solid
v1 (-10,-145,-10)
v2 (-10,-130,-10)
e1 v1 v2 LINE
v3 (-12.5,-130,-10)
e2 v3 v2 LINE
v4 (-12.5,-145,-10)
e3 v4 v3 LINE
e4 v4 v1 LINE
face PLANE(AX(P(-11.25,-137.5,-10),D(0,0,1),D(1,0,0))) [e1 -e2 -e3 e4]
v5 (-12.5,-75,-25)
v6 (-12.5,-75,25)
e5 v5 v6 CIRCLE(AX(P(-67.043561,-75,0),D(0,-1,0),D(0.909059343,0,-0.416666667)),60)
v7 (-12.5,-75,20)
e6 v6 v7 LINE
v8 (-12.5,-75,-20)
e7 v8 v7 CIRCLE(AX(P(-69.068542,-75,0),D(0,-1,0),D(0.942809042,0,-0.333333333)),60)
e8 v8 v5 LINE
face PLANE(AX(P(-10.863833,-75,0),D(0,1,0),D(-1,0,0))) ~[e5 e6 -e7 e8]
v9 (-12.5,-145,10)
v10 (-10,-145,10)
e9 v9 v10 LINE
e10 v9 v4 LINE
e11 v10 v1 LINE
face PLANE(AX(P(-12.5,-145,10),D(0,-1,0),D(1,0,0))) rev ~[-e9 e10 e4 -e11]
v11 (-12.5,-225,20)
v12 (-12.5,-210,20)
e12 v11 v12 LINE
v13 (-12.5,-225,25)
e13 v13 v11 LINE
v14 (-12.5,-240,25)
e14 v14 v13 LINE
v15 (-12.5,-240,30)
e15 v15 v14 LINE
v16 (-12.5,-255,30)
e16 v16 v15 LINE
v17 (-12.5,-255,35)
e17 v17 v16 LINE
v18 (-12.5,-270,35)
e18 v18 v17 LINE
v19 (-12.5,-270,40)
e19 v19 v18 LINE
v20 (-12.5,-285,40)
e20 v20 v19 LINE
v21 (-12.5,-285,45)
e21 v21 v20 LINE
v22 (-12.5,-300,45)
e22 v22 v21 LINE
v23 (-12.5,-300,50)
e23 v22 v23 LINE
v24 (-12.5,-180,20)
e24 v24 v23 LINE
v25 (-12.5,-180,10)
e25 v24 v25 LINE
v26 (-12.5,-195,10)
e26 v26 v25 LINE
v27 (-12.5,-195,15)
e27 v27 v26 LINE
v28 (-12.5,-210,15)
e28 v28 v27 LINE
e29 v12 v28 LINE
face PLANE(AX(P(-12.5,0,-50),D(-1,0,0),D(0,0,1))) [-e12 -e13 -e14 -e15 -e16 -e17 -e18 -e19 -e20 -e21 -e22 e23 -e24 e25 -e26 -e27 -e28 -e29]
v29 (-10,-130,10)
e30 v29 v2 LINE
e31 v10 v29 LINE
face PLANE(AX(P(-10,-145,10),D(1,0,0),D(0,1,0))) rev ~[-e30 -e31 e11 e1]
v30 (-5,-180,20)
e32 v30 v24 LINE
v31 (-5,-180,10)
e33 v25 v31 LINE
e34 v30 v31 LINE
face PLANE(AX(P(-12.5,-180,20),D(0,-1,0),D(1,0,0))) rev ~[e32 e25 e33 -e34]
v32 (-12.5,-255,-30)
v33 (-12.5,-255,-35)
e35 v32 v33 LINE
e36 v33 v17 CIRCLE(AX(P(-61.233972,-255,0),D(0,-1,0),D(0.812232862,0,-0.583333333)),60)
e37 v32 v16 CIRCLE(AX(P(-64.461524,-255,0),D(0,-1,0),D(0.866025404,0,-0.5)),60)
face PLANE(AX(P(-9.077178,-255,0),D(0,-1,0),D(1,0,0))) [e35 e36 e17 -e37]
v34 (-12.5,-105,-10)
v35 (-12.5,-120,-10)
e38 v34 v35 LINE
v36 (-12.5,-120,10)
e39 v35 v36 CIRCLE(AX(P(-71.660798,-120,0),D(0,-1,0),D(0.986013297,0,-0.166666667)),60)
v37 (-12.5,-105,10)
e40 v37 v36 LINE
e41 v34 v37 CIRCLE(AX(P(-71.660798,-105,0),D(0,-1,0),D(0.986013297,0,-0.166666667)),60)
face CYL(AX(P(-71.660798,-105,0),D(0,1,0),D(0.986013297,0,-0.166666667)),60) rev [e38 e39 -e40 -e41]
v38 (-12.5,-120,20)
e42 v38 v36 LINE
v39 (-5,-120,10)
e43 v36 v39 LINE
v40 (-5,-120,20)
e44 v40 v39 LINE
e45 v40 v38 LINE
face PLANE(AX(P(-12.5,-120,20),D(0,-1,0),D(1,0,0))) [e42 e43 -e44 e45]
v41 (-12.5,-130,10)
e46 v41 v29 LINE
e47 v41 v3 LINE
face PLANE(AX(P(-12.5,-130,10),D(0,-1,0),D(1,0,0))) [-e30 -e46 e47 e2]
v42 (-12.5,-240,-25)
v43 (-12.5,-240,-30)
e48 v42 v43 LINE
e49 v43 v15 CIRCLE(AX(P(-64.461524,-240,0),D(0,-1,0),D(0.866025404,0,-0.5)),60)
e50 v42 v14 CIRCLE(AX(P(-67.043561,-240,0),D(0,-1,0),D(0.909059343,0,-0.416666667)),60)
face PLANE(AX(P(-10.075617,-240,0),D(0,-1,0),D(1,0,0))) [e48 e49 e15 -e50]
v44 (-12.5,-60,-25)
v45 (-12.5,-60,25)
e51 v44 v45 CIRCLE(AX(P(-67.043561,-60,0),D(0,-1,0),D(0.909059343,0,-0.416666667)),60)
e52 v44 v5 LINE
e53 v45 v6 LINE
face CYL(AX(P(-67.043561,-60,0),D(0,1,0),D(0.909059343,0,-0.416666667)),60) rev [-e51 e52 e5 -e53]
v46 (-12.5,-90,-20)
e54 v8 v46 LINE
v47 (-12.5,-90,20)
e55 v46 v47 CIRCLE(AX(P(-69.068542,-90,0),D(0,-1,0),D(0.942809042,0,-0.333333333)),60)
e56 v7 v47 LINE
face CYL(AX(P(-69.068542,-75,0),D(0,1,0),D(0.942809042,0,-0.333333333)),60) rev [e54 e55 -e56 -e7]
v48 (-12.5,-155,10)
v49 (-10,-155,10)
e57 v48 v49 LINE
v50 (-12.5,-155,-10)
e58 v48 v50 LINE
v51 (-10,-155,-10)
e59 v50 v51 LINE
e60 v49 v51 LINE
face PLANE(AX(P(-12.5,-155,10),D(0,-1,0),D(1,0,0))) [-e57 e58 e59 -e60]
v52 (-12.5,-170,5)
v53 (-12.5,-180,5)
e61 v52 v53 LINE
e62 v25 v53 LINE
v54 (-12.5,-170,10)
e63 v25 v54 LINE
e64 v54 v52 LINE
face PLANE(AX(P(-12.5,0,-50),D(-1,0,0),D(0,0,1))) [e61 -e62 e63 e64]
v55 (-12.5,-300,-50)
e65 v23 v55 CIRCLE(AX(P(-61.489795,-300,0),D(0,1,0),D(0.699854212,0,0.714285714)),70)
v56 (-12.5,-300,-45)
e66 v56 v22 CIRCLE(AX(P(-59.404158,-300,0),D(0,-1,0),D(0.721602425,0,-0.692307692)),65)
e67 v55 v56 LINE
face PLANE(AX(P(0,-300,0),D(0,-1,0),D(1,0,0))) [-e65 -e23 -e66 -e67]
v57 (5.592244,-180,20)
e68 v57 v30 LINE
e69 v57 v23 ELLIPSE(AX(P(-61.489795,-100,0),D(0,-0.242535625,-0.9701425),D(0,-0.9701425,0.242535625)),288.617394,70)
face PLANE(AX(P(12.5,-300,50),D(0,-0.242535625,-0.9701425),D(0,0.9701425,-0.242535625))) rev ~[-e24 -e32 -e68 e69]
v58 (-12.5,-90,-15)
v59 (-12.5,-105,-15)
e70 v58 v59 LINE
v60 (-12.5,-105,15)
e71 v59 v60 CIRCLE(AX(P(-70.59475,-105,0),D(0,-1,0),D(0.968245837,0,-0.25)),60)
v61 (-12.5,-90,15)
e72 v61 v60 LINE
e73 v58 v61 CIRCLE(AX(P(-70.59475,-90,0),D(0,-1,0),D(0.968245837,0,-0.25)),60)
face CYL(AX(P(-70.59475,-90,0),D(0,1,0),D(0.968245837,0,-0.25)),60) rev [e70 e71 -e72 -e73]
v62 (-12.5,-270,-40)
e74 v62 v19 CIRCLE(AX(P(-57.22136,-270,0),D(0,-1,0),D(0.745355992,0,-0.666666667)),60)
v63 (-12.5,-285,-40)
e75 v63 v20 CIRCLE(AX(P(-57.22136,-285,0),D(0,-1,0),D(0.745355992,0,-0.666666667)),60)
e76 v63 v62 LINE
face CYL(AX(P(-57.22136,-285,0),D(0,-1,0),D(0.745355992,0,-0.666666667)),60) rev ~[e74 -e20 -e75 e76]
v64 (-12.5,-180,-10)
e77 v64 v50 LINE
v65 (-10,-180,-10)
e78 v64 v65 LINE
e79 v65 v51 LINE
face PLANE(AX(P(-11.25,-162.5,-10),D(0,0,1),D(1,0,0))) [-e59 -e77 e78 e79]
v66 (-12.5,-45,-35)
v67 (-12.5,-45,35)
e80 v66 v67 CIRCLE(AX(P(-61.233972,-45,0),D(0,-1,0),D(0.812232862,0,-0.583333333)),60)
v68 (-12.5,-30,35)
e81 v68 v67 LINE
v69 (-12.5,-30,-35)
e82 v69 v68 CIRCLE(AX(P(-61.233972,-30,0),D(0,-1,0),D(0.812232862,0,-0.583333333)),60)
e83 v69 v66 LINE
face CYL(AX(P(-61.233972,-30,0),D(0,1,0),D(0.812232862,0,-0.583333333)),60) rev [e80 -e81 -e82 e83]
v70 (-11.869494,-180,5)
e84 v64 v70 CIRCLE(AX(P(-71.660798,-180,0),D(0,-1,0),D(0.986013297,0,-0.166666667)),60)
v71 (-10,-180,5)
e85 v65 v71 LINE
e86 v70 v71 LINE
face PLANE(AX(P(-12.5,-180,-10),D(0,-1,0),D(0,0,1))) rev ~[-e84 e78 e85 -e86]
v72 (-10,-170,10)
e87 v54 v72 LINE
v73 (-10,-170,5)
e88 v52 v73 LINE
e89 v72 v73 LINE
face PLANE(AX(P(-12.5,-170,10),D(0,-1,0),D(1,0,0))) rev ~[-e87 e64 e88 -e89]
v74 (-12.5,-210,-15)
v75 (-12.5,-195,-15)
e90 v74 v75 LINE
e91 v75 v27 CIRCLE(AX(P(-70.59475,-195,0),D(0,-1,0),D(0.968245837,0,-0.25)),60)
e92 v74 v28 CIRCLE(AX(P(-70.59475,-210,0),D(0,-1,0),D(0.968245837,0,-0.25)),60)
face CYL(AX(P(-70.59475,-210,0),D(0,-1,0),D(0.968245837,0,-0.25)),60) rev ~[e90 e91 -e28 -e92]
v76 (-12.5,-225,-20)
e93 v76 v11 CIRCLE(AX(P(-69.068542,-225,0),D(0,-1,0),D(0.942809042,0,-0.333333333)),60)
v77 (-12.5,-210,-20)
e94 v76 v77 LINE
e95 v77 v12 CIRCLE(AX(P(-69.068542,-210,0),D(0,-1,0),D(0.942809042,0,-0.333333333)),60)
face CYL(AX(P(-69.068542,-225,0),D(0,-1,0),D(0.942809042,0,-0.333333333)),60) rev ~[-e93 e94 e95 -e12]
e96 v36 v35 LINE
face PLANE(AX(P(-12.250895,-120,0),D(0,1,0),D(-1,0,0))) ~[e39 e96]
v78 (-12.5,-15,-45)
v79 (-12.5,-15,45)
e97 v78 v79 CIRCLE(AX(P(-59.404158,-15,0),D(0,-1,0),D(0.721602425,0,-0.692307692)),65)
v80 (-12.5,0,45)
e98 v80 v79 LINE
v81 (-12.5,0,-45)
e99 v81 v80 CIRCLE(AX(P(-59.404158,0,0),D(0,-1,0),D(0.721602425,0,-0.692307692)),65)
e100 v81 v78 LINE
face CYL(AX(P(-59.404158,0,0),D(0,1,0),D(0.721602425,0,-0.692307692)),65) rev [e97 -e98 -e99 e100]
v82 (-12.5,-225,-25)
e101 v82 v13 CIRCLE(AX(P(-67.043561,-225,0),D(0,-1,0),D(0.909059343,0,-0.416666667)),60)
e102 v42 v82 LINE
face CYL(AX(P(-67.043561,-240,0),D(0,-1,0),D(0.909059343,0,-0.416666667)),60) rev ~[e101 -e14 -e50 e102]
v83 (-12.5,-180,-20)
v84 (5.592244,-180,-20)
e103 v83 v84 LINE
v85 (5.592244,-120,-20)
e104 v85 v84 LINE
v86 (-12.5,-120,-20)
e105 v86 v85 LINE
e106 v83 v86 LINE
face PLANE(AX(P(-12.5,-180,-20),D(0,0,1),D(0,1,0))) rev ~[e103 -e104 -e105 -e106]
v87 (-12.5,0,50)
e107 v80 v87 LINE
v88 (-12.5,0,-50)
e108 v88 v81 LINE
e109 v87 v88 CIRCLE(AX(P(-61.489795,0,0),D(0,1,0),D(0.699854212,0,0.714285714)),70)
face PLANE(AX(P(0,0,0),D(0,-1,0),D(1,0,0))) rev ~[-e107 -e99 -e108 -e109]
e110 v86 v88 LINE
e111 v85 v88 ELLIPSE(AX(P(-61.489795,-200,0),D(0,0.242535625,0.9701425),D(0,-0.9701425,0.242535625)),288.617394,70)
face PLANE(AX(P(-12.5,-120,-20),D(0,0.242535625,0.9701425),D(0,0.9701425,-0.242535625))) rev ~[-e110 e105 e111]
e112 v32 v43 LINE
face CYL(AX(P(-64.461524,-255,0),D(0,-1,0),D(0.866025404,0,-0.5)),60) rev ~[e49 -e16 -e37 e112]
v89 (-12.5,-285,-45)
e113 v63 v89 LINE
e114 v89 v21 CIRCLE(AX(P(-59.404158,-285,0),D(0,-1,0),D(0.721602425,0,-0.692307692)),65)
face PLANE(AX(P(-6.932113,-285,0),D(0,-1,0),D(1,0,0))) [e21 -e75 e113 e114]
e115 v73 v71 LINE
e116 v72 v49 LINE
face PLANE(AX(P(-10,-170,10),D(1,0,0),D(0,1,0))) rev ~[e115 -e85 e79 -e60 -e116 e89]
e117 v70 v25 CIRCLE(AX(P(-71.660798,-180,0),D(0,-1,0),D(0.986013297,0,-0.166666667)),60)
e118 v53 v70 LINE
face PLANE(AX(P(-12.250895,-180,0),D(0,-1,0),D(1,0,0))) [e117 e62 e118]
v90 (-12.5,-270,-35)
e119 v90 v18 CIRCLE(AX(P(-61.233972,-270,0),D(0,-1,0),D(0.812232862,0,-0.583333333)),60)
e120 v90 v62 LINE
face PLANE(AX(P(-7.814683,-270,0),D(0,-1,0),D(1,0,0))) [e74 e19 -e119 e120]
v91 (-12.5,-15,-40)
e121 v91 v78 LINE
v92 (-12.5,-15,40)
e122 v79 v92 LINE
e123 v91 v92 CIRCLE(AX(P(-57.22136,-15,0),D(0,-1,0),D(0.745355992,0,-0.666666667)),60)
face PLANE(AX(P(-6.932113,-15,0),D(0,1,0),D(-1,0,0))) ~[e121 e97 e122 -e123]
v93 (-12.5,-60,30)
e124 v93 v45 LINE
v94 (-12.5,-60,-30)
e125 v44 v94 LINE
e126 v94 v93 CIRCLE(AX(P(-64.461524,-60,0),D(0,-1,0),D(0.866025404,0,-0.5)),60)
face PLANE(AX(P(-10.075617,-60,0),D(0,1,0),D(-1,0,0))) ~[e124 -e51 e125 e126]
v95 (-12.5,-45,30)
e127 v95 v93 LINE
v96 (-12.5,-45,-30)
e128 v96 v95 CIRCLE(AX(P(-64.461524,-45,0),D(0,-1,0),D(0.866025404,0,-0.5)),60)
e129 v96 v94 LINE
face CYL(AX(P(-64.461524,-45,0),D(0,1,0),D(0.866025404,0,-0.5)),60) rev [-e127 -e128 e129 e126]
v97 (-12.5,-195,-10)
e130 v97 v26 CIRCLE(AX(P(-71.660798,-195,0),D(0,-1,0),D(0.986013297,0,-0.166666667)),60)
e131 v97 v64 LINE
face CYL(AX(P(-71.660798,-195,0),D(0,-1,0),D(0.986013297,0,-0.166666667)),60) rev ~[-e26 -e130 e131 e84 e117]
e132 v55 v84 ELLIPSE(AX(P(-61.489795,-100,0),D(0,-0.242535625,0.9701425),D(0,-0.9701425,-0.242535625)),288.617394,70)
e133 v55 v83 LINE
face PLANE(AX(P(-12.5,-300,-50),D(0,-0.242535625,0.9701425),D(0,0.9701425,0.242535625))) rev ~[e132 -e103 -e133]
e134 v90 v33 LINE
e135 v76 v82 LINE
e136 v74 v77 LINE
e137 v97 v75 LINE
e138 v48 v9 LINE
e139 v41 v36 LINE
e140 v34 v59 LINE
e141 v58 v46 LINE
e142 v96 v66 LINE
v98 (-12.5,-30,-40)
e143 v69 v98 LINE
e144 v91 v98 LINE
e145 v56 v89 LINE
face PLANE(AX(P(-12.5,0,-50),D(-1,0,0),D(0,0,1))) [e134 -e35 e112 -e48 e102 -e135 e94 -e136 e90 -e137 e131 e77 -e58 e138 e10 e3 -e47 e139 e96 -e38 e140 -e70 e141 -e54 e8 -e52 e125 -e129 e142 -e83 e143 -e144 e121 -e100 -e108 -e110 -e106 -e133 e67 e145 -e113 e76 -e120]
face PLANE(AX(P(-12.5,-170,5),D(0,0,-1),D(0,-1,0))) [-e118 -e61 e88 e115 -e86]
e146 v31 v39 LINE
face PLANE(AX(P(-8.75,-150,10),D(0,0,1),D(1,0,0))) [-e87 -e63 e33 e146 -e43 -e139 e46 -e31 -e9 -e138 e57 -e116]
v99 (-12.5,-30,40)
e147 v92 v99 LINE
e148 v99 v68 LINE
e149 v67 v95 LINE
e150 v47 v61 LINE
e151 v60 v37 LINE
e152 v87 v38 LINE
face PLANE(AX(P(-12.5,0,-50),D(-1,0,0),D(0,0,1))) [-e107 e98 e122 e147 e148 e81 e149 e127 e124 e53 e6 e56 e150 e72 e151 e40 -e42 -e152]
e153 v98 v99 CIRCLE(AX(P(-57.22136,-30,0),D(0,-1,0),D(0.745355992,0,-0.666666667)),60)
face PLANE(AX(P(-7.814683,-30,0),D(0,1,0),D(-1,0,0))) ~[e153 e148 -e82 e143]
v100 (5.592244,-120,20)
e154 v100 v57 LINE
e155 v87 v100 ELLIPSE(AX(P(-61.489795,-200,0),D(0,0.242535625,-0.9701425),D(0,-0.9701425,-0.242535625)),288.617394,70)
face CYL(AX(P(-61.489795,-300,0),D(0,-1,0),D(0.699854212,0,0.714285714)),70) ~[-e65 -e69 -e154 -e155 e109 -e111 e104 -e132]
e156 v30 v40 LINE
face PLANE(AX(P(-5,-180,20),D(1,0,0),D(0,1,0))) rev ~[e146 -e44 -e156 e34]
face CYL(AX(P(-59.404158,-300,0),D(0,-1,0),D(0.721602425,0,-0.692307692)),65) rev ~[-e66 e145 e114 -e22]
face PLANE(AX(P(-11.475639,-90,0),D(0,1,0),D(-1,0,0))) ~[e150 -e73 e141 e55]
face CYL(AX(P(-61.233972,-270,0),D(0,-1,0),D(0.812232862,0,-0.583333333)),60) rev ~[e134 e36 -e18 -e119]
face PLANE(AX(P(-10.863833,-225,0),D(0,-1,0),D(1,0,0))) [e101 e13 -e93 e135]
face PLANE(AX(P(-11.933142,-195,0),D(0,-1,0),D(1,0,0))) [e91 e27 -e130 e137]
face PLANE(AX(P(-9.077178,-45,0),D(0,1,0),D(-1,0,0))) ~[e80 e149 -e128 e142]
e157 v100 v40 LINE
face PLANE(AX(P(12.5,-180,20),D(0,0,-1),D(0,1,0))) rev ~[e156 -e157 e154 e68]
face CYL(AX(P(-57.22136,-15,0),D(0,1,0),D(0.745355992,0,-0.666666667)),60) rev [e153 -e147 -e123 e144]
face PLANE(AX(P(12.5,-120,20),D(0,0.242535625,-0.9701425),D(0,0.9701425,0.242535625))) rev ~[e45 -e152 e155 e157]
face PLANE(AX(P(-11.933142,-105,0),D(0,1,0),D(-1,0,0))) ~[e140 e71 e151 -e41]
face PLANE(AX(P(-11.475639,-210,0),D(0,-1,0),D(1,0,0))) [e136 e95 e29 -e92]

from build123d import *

# Parameters (mm, degrees)
F0_W      = 25
F0_H      = 100
F1_DEPTH  = 300
F3_DEPTH  = 80
F5_DEPTH  = 80
F7_DEPTH  = 15
F9_DEPTH  = 15
F11_DEPTH = 15
F13_DEPTH = 15
F15_DEPTH = 15
F17_DEPTH = 15
F19_DEPTH = 15
F21_DEPTH = 15
F23_DEPTH = 300
F24_W     = 7.5
F24_H     = 60
F25_DEPTH = 10
F26_W     = 2.5
F26_H     = 15
F27_DEPTH = 20
F28_W     = 10
F28_H     = 15
F29_DEPTH = 2.5


# Not quite as in the source:
# - a pattern or mirror of a feature is missing from the dataset's text; its kind, count and spacing are read off the source's solid


with BuildPart() as f1:
    # F0 (on Front) → F1 (new body)
    with BuildSketch(Plane.XZ):
        Rectangle(F0_W, F0_H)
    extrude(amount=F1_DEPTH)

    # F2 (on face) → F3 (cut)
    with BuildSketch(Plane.YZ.offset(12.5)):
        Polygon((-180, 20), (-120, 20), (0, 50), (-300, 50), align=None)
    extrude(amount=-F3_DEPTH, mode=Mode.SUBTRACT)

    # F4 (on face) → F5 (cut)
    with BuildSketch(Plane(origin=(-12.5, 0, 0), x_dir=(0, -1, 0), z_dir=(-1, 0, 0))):
        Polygon((180, -20), (120, -20), (0, -50), (300, -50), align=None)
    extrude(amount=-F5_DEPTH, mode=Mode.SUBTRACT)

    # F6 (on face) → F7 (cut)
    with BuildSketch(Plane.XZ.offset(300)):
        with BuildLine():
            Line((-12.5, 45), (-12.5, -45))
            ThreePointArc((-12.5, -45), (5.5958424018, 0), (-12.5, 45))
        make_face()
    f7 = extrude(amount=-F7_DEPTH, mode=Mode.SUBTRACT)

    # F7_copies: F7 across plane
    add(f7.mirror(Plane.ZX.offset(-150)), mode=Mode.SUBTRACT)

    # F8 (on face) → F9 (cut)
    with BuildSketch(Plane.XZ.offset(285)):
        with BuildLine():
            Line((-12.5, 40), (-12.5, -40))
            ThreePointArc((-12.5, -40), (2.77864045, 0), (-12.5, 40))
        make_face()
    f9 = extrude(amount=-F9_DEPTH, mode=Mode.SUBTRACT)

    # F9_copies: F9 across plane
    add(f9.mirror(Plane.ZX.offset(-150)), mode=Mode.SUBTRACT)

    # F10 (on face) → F11 (cut)
    with BuildSketch(Plane.XZ.offset(270)):
        with BuildLine():
            Line((-12.5, 35), (-12.5, -35))
            ThreePointArc((-12.5, -35), (-1.233971724, 0), (-12.5, 35))
        make_face()
    f11 = extrude(amount=-F11_DEPTH, mode=Mode.SUBTRACT)

    # F11_copies: F11 across plane
    add(f11.mirror(Plane.ZX.offset(-150)), mode=Mode.SUBTRACT)

    # F12 (on face) → F13 (cut)
    with BuildSketch(Plane.XZ.offset(255)):
        with BuildLine():
            Line((-12.5, 30), (-12.5, -30))
            ThreePointArc((-12.5, -30), (-4.4615242271, 0), (-12.5, 30))
        make_face()
    f13 = extrude(amount=-F13_DEPTH, mode=Mode.SUBTRACT)

    # F13_copies: F13 across plane
    add(f13.mirror(Plane.ZX.offset(-150)), mode=Mode.SUBTRACT)

    # F14 (on face) → F15 (cut)
    with BuildSketch(Plane.XZ.offset(240)):
        with BuildLine():
            Line((-12.5, 25), (-12.5, -25))
            ThreePointArc((-12.5, -25), (-7.0435605732, 0), (-12.5, 25))
        make_face()
    f15 = extrude(amount=-F15_DEPTH, mode=Mode.SUBTRACT)

    # F15_copies: F15 across plane
    add(f15.mirror(Plane.ZX.offset(-150)), mode=Mode.SUBTRACT)

    # F16 (on face) → F17 (cut)
    with BuildSketch(Plane.XZ.offset(225)):
        with BuildLine():
            Line((-12.5, 20), (-12.5, -20))
            ThreePointArc((-12.5, -20), (-9.0685424949, 0), (-12.5, 20))
        make_face()
    f17 = extrude(amount=-F17_DEPTH, mode=Mode.SUBTRACT)

    # F17_copies: F17 across plane
    add(f17.mirror(Plane.ZX.offset(-150)), mode=Mode.SUBTRACT)

    # F18 (on face) → F19 (cut)
    with BuildSketch(Plane.XZ.offset(210)):
        with BuildLine():
            Line((-12.5, 15), (-12.5, -15))
            ThreePointArc((-12.5, -15), (-10.5947501931, 0), (-12.5, 15))
        make_face()
    f19 = extrude(amount=-F19_DEPTH, mode=Mode.SUBTRACT)

    # F19_copies: F19 across plane
    add(f19.mirror(Plane.ZX.offset(-150)), mode=Mode.SUBTRACT)

    # F20 (on face) → F21 (cut)
    with BuildSketch(Plane.XZ.offset(195)):
        with BuildLine():
            Line((-12.5, 10), (-12.5, -10))
            ThreePointArc((-12.5, -10), (-11.660797831, 0), (-12.5, 10))
        make_face()
    f21 = extrude(amount=-F21_DEPTH, mode=Mode.SUBTRACT)

    # F21_copies: F21 across plane
    add(f21.mirror(Plane.ZX.offset(-150)), mode=Mode.SUBTRACT)

    # F22 (on face) → F23 (cut)
    with BuildSketch(Plane.XZ.offset(300)):
        with BuildLine():
            Line((12.5, 50), (-12.5, 50))
            ThreePointArc((-12.5, 50), (8.5102051443, 0), (-12.5, -50))
            Line((-12.5, -50), (12.5, -50))
            Line((12.5, -50), (12.5, 50))
        make_face()
    extrude(amount=-F23_DEPTH, mode=Mode.SUBTRACT)

    # F24 (on face) → F25 (cut)
    with BuildSketch(Plane.XY.offset(20)):
        with Locations((-8.75, -150)):
            Rectangle(F24_W, F24_H)
    extrude(amount=-F25_DEPTH, mode=Mode.SUBTRACT)

    # F26 (on face) → F27 (cut)
    with BuildSketch(Plane.XY.offset(10)):
        with Locations((-11.25, -162.5)):
            Rectangle(F26_W, F26_H)
        with Locations((-11.25, -137.5)):
            Rectangle(F26_W, F26_H)
    extrude(amount=-F27_DEPTH, mode=Mode.SUBTRACT)

    # F28 (on face) → F29 (cut)
    with BuildSketch(Plane(origin=(-12.5, 0, 0), x_dir=(0, -1, 0), z_dir=(-1, 0, 0))):
        with Locations((175, -2.5)):
            Rectangle(F28_W, F28_H)
    extrude(amount=-F29_DEPTH, mode=Mode.SUBTRACT)


solid = f1.part
